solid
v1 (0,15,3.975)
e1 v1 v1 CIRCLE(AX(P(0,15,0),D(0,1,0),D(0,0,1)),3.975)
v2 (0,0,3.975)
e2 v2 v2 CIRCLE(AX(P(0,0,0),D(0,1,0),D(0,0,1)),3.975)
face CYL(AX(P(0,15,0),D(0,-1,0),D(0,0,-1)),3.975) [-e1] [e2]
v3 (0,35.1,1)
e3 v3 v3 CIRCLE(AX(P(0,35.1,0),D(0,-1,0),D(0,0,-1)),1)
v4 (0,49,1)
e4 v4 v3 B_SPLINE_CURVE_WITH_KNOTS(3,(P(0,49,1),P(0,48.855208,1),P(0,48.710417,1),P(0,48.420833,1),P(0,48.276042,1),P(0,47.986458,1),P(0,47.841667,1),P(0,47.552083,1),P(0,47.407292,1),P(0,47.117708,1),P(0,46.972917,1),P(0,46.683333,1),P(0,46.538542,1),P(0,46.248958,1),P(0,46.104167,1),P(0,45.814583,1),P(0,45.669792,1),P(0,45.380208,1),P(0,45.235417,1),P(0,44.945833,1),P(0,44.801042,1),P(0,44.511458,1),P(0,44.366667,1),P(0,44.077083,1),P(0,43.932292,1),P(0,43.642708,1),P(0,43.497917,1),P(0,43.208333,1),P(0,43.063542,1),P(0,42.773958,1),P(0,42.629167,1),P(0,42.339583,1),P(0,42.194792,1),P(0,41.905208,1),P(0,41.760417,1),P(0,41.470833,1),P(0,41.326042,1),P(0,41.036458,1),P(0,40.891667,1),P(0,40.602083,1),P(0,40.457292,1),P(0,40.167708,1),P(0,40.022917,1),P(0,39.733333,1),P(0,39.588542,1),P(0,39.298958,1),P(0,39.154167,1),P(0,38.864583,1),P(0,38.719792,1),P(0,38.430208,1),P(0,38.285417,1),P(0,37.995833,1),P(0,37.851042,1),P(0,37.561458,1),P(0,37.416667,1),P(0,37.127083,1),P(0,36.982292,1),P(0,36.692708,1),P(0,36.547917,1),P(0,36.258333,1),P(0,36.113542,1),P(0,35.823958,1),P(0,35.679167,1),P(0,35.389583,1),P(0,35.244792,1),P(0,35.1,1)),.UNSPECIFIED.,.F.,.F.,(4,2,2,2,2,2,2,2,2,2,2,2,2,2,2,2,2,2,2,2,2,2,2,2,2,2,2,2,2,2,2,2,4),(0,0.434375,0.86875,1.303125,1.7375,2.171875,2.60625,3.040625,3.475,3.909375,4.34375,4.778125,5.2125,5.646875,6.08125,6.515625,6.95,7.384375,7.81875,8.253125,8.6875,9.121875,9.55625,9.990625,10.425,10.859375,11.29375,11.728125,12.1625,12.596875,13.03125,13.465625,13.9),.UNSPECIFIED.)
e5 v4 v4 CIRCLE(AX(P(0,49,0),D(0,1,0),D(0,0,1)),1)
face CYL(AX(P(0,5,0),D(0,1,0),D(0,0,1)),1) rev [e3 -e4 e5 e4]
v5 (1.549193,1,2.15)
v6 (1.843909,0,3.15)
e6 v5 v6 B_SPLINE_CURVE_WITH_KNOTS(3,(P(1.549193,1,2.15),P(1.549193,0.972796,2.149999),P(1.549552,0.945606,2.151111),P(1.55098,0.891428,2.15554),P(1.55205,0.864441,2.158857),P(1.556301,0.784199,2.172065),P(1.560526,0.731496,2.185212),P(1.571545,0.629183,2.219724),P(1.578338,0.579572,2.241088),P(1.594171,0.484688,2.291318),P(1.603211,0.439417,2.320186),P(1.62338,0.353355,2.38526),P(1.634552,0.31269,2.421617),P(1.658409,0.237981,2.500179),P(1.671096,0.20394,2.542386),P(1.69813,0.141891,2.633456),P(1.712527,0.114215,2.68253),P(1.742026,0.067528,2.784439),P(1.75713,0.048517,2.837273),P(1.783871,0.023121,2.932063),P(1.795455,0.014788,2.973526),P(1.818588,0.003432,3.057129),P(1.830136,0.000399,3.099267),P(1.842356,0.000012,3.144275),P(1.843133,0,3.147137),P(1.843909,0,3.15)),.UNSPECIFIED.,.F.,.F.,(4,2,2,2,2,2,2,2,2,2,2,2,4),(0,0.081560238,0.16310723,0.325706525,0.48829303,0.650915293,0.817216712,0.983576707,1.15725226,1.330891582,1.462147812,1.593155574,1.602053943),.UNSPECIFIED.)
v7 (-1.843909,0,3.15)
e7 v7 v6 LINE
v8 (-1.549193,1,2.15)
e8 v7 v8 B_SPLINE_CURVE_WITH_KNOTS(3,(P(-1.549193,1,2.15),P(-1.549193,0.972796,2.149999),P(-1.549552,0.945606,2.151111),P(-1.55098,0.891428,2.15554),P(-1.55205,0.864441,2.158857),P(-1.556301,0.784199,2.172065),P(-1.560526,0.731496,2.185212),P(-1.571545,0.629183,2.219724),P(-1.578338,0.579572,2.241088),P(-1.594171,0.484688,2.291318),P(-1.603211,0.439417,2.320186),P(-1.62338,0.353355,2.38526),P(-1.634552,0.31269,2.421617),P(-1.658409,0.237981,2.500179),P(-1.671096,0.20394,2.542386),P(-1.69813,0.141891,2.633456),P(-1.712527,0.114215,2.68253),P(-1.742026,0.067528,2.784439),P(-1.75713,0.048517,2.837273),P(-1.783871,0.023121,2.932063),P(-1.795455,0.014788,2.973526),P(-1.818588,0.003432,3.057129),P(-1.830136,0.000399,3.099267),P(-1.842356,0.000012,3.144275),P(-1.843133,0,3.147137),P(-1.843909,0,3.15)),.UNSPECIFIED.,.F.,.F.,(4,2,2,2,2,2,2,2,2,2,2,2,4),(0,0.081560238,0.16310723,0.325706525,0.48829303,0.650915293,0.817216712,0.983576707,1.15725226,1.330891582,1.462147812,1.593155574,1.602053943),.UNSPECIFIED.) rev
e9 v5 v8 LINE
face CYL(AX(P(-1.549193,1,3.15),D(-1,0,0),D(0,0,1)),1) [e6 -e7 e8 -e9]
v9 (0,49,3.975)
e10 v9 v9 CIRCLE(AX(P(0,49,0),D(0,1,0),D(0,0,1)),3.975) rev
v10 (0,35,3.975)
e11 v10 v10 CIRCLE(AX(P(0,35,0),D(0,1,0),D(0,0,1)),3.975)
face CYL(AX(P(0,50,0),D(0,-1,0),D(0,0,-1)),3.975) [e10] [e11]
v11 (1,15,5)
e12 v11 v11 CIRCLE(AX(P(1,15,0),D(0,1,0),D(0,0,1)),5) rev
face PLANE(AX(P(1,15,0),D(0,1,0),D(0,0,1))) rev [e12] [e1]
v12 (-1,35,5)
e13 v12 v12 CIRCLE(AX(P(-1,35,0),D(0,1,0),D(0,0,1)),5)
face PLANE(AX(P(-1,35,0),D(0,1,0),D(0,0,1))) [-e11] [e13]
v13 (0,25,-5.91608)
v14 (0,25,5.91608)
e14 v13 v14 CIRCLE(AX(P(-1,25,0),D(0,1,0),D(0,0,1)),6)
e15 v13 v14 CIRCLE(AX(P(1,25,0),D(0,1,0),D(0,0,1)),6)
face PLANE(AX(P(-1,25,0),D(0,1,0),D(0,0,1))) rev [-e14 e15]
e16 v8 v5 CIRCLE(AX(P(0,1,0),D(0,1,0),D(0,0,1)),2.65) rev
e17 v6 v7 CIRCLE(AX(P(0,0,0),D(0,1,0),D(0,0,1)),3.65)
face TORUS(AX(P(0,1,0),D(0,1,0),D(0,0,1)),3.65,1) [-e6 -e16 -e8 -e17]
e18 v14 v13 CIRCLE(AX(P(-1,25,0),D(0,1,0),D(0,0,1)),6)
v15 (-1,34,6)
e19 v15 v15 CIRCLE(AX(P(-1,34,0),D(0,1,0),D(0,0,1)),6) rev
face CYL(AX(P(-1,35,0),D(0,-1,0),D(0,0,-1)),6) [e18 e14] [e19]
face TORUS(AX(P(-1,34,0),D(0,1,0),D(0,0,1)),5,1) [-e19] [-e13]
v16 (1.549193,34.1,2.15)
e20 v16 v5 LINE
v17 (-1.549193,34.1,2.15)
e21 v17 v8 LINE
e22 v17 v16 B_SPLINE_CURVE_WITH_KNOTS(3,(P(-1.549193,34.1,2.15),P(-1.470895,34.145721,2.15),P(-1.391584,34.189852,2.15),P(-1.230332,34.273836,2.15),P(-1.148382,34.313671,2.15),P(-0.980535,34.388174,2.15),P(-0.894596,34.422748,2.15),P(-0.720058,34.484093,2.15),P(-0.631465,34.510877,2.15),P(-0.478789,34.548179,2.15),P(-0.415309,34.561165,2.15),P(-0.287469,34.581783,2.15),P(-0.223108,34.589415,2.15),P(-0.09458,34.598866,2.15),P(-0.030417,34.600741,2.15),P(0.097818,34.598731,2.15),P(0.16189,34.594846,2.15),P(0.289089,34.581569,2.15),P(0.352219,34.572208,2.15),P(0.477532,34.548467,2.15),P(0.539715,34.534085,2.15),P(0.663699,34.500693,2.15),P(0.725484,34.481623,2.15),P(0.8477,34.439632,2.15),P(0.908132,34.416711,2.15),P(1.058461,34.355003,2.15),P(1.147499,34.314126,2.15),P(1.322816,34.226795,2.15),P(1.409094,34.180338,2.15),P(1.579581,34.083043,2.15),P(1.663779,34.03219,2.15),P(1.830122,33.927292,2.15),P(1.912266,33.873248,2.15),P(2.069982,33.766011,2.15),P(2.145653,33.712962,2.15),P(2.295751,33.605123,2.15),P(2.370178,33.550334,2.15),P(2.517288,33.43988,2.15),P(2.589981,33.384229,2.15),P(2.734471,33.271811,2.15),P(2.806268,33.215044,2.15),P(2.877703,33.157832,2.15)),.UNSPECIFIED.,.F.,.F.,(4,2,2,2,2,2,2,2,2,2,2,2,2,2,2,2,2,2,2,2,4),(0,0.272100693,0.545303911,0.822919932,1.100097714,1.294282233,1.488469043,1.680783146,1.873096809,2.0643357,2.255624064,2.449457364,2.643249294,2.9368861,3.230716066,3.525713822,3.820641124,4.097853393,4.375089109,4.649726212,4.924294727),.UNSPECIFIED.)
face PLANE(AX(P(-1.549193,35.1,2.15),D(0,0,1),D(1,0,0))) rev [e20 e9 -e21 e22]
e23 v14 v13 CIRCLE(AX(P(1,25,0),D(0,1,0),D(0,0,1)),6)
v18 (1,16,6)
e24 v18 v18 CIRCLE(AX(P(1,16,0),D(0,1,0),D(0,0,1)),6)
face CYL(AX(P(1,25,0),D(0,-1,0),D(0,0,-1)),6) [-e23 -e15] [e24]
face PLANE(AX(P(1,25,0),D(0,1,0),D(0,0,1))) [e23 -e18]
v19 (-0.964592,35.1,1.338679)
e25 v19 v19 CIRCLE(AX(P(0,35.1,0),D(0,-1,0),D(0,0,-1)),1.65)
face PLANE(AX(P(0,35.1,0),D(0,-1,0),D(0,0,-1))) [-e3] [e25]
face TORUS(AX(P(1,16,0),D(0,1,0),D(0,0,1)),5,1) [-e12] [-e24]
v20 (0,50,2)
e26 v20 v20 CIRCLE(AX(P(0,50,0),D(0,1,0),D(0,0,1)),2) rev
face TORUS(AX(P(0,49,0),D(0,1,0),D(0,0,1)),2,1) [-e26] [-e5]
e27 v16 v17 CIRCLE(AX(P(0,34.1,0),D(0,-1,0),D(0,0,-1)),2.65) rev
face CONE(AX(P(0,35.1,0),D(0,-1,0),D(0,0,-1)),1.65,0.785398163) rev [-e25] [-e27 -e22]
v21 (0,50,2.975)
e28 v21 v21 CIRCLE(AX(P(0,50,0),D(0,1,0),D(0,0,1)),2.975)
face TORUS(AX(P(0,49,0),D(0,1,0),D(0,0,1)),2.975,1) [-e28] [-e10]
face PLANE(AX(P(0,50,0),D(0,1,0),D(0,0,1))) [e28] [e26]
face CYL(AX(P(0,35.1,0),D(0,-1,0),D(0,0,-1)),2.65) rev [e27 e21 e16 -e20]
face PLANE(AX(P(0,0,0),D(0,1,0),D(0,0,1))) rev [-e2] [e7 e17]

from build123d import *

# Parameters (mm, degrees)
SKETCH1_R           = 3.975
BOSS_EXTRUDE1_DEPTH = 15
SKETCH2_R           = 6
BOSS_EXTRUDE2_DEPTH = 10
SKETCH3_R           = 6
BOSS_EXTRUDE3_DEPTH = 10
SKETCH4_R           = 3.975
BOSS_EXTRUDE4_DEPTH = 15
CUT_EXTRUDE1_DEPTH  = 35.1
SKETCH6_R           = 1
CUT_EXTRUDE2_DEPTH  = 45
FILLET1_R           = 1
FILLET2_R           = 1


with BuildPart() as part:
    # Sketch1 → Boss-Extrude1 (new body)
    with BuildSketch(Plane(origin=(0, 0, 0), x_dir=(1, 0, 0), z_dir=(0, 1, 0))):
        with Locations(Location((0, 0, 0), (0, 0, 270))):
            Circle(SKETCH1_R)
    extrude(amount=BOSS_EXTRUDE1_DEPTH)

    # Sketch2 → Boss-Extrude2 (add)
    with BuildSketch(Plane(origin=(0, 15, 0), x_dir=(1, 0, 0), z_dir=(0, 1, 0))):
        with Locations(Location((1, 0, 0), (0, 0, 270))):
            Circle(SKETCH2_R)
    extrude(amount=BOSS_EXTRUDE2_DEPTH)

    # Sketch3 → Boss-Extrude3 (add)
    with BuildSketch(Plane(origin=(0, 25, 0), x_dir=(1, 0, 0), z_dir=(0, 1, 0))):
        with Locations(Location((-1, 0, 0), (0, 0, 80.405931773))):
            Circle(SKETCH3_R)
    extrude(amount=BOSS_EXTRUDE3_DEPTH)

    # Sketch4 → Boss-Extrude4 (add)
    with BuildSketch(Plane(origin=(0, 35, 0), x_dir=(1, 0, 0), z_dir=(0, 1, 0))):
        with Locations(Location((0, 0, 0), (0, 0, 270))):
            Circle(SKETCH4_R)
    extrude(amount=BOSS_EXTRUDE4_DEPTH)

    # Sketch5 → Cut-Extrude1 (cut)
    with BuildSketch(Plane.XZ):
        with BuildLine():
            Line((-1.549193338, 2.15), (1.549193338, 2.15))
            ThreePointArc((1.549193338, 2.15), (0, -2.65), (-1.549193338, 2.15))
        make_face()
    extrude(amount=-CUT_EXTRUDE1_DEPTH, mode=Mode.SUBTRACT)

    # Sketch6 → Cut-Extrude2 (cut)
    with BuildSketch(Plane(origin=(0, 50, 0), x_dir=(1, 0, 0), z_dir=(0, 1, 0))):
        with Locations(Location((0, 0, 0), (0, 0, 270))):
            Circle(SKETCH6_R)
    extrude(amount=-CUT_EXTRUDE2_DEPTH, mode=Mode.SUBTRACT)

    # Fillet1
    fillet1_edges = [part.edges().sort_by_distance(p)[0] for p in [
        (-2, 35, 5.916079783),
        (0, 50, -3.975),
        (0, 50, -1),
        (1, 15, -6),
    ]]
    fillet(fillet1_edges, radius=FILLET1_R)

    # Fillet2
    fillet2_edges = [part.edges().sort_by_distance(p)[0] for p in [
        (0, 0, -2.65),
        (0, 0, 2.15),
    ]]
    fillet(fillet2_edges, radius=FILLET2_R)

    # Chamfer1: read off the stored shape, not the designer's step
    # Chamfer1 outline → Chamfer1 (revolve)
    with BuildSketch(Plane.XY):
        Polygon((2.65, 35.1), (1.65, 35.1), (2.65, 34.1), align=None)
    revolve(axis=Axis((0, 0, 0), (0, 1, 0)))


solid = part.part
